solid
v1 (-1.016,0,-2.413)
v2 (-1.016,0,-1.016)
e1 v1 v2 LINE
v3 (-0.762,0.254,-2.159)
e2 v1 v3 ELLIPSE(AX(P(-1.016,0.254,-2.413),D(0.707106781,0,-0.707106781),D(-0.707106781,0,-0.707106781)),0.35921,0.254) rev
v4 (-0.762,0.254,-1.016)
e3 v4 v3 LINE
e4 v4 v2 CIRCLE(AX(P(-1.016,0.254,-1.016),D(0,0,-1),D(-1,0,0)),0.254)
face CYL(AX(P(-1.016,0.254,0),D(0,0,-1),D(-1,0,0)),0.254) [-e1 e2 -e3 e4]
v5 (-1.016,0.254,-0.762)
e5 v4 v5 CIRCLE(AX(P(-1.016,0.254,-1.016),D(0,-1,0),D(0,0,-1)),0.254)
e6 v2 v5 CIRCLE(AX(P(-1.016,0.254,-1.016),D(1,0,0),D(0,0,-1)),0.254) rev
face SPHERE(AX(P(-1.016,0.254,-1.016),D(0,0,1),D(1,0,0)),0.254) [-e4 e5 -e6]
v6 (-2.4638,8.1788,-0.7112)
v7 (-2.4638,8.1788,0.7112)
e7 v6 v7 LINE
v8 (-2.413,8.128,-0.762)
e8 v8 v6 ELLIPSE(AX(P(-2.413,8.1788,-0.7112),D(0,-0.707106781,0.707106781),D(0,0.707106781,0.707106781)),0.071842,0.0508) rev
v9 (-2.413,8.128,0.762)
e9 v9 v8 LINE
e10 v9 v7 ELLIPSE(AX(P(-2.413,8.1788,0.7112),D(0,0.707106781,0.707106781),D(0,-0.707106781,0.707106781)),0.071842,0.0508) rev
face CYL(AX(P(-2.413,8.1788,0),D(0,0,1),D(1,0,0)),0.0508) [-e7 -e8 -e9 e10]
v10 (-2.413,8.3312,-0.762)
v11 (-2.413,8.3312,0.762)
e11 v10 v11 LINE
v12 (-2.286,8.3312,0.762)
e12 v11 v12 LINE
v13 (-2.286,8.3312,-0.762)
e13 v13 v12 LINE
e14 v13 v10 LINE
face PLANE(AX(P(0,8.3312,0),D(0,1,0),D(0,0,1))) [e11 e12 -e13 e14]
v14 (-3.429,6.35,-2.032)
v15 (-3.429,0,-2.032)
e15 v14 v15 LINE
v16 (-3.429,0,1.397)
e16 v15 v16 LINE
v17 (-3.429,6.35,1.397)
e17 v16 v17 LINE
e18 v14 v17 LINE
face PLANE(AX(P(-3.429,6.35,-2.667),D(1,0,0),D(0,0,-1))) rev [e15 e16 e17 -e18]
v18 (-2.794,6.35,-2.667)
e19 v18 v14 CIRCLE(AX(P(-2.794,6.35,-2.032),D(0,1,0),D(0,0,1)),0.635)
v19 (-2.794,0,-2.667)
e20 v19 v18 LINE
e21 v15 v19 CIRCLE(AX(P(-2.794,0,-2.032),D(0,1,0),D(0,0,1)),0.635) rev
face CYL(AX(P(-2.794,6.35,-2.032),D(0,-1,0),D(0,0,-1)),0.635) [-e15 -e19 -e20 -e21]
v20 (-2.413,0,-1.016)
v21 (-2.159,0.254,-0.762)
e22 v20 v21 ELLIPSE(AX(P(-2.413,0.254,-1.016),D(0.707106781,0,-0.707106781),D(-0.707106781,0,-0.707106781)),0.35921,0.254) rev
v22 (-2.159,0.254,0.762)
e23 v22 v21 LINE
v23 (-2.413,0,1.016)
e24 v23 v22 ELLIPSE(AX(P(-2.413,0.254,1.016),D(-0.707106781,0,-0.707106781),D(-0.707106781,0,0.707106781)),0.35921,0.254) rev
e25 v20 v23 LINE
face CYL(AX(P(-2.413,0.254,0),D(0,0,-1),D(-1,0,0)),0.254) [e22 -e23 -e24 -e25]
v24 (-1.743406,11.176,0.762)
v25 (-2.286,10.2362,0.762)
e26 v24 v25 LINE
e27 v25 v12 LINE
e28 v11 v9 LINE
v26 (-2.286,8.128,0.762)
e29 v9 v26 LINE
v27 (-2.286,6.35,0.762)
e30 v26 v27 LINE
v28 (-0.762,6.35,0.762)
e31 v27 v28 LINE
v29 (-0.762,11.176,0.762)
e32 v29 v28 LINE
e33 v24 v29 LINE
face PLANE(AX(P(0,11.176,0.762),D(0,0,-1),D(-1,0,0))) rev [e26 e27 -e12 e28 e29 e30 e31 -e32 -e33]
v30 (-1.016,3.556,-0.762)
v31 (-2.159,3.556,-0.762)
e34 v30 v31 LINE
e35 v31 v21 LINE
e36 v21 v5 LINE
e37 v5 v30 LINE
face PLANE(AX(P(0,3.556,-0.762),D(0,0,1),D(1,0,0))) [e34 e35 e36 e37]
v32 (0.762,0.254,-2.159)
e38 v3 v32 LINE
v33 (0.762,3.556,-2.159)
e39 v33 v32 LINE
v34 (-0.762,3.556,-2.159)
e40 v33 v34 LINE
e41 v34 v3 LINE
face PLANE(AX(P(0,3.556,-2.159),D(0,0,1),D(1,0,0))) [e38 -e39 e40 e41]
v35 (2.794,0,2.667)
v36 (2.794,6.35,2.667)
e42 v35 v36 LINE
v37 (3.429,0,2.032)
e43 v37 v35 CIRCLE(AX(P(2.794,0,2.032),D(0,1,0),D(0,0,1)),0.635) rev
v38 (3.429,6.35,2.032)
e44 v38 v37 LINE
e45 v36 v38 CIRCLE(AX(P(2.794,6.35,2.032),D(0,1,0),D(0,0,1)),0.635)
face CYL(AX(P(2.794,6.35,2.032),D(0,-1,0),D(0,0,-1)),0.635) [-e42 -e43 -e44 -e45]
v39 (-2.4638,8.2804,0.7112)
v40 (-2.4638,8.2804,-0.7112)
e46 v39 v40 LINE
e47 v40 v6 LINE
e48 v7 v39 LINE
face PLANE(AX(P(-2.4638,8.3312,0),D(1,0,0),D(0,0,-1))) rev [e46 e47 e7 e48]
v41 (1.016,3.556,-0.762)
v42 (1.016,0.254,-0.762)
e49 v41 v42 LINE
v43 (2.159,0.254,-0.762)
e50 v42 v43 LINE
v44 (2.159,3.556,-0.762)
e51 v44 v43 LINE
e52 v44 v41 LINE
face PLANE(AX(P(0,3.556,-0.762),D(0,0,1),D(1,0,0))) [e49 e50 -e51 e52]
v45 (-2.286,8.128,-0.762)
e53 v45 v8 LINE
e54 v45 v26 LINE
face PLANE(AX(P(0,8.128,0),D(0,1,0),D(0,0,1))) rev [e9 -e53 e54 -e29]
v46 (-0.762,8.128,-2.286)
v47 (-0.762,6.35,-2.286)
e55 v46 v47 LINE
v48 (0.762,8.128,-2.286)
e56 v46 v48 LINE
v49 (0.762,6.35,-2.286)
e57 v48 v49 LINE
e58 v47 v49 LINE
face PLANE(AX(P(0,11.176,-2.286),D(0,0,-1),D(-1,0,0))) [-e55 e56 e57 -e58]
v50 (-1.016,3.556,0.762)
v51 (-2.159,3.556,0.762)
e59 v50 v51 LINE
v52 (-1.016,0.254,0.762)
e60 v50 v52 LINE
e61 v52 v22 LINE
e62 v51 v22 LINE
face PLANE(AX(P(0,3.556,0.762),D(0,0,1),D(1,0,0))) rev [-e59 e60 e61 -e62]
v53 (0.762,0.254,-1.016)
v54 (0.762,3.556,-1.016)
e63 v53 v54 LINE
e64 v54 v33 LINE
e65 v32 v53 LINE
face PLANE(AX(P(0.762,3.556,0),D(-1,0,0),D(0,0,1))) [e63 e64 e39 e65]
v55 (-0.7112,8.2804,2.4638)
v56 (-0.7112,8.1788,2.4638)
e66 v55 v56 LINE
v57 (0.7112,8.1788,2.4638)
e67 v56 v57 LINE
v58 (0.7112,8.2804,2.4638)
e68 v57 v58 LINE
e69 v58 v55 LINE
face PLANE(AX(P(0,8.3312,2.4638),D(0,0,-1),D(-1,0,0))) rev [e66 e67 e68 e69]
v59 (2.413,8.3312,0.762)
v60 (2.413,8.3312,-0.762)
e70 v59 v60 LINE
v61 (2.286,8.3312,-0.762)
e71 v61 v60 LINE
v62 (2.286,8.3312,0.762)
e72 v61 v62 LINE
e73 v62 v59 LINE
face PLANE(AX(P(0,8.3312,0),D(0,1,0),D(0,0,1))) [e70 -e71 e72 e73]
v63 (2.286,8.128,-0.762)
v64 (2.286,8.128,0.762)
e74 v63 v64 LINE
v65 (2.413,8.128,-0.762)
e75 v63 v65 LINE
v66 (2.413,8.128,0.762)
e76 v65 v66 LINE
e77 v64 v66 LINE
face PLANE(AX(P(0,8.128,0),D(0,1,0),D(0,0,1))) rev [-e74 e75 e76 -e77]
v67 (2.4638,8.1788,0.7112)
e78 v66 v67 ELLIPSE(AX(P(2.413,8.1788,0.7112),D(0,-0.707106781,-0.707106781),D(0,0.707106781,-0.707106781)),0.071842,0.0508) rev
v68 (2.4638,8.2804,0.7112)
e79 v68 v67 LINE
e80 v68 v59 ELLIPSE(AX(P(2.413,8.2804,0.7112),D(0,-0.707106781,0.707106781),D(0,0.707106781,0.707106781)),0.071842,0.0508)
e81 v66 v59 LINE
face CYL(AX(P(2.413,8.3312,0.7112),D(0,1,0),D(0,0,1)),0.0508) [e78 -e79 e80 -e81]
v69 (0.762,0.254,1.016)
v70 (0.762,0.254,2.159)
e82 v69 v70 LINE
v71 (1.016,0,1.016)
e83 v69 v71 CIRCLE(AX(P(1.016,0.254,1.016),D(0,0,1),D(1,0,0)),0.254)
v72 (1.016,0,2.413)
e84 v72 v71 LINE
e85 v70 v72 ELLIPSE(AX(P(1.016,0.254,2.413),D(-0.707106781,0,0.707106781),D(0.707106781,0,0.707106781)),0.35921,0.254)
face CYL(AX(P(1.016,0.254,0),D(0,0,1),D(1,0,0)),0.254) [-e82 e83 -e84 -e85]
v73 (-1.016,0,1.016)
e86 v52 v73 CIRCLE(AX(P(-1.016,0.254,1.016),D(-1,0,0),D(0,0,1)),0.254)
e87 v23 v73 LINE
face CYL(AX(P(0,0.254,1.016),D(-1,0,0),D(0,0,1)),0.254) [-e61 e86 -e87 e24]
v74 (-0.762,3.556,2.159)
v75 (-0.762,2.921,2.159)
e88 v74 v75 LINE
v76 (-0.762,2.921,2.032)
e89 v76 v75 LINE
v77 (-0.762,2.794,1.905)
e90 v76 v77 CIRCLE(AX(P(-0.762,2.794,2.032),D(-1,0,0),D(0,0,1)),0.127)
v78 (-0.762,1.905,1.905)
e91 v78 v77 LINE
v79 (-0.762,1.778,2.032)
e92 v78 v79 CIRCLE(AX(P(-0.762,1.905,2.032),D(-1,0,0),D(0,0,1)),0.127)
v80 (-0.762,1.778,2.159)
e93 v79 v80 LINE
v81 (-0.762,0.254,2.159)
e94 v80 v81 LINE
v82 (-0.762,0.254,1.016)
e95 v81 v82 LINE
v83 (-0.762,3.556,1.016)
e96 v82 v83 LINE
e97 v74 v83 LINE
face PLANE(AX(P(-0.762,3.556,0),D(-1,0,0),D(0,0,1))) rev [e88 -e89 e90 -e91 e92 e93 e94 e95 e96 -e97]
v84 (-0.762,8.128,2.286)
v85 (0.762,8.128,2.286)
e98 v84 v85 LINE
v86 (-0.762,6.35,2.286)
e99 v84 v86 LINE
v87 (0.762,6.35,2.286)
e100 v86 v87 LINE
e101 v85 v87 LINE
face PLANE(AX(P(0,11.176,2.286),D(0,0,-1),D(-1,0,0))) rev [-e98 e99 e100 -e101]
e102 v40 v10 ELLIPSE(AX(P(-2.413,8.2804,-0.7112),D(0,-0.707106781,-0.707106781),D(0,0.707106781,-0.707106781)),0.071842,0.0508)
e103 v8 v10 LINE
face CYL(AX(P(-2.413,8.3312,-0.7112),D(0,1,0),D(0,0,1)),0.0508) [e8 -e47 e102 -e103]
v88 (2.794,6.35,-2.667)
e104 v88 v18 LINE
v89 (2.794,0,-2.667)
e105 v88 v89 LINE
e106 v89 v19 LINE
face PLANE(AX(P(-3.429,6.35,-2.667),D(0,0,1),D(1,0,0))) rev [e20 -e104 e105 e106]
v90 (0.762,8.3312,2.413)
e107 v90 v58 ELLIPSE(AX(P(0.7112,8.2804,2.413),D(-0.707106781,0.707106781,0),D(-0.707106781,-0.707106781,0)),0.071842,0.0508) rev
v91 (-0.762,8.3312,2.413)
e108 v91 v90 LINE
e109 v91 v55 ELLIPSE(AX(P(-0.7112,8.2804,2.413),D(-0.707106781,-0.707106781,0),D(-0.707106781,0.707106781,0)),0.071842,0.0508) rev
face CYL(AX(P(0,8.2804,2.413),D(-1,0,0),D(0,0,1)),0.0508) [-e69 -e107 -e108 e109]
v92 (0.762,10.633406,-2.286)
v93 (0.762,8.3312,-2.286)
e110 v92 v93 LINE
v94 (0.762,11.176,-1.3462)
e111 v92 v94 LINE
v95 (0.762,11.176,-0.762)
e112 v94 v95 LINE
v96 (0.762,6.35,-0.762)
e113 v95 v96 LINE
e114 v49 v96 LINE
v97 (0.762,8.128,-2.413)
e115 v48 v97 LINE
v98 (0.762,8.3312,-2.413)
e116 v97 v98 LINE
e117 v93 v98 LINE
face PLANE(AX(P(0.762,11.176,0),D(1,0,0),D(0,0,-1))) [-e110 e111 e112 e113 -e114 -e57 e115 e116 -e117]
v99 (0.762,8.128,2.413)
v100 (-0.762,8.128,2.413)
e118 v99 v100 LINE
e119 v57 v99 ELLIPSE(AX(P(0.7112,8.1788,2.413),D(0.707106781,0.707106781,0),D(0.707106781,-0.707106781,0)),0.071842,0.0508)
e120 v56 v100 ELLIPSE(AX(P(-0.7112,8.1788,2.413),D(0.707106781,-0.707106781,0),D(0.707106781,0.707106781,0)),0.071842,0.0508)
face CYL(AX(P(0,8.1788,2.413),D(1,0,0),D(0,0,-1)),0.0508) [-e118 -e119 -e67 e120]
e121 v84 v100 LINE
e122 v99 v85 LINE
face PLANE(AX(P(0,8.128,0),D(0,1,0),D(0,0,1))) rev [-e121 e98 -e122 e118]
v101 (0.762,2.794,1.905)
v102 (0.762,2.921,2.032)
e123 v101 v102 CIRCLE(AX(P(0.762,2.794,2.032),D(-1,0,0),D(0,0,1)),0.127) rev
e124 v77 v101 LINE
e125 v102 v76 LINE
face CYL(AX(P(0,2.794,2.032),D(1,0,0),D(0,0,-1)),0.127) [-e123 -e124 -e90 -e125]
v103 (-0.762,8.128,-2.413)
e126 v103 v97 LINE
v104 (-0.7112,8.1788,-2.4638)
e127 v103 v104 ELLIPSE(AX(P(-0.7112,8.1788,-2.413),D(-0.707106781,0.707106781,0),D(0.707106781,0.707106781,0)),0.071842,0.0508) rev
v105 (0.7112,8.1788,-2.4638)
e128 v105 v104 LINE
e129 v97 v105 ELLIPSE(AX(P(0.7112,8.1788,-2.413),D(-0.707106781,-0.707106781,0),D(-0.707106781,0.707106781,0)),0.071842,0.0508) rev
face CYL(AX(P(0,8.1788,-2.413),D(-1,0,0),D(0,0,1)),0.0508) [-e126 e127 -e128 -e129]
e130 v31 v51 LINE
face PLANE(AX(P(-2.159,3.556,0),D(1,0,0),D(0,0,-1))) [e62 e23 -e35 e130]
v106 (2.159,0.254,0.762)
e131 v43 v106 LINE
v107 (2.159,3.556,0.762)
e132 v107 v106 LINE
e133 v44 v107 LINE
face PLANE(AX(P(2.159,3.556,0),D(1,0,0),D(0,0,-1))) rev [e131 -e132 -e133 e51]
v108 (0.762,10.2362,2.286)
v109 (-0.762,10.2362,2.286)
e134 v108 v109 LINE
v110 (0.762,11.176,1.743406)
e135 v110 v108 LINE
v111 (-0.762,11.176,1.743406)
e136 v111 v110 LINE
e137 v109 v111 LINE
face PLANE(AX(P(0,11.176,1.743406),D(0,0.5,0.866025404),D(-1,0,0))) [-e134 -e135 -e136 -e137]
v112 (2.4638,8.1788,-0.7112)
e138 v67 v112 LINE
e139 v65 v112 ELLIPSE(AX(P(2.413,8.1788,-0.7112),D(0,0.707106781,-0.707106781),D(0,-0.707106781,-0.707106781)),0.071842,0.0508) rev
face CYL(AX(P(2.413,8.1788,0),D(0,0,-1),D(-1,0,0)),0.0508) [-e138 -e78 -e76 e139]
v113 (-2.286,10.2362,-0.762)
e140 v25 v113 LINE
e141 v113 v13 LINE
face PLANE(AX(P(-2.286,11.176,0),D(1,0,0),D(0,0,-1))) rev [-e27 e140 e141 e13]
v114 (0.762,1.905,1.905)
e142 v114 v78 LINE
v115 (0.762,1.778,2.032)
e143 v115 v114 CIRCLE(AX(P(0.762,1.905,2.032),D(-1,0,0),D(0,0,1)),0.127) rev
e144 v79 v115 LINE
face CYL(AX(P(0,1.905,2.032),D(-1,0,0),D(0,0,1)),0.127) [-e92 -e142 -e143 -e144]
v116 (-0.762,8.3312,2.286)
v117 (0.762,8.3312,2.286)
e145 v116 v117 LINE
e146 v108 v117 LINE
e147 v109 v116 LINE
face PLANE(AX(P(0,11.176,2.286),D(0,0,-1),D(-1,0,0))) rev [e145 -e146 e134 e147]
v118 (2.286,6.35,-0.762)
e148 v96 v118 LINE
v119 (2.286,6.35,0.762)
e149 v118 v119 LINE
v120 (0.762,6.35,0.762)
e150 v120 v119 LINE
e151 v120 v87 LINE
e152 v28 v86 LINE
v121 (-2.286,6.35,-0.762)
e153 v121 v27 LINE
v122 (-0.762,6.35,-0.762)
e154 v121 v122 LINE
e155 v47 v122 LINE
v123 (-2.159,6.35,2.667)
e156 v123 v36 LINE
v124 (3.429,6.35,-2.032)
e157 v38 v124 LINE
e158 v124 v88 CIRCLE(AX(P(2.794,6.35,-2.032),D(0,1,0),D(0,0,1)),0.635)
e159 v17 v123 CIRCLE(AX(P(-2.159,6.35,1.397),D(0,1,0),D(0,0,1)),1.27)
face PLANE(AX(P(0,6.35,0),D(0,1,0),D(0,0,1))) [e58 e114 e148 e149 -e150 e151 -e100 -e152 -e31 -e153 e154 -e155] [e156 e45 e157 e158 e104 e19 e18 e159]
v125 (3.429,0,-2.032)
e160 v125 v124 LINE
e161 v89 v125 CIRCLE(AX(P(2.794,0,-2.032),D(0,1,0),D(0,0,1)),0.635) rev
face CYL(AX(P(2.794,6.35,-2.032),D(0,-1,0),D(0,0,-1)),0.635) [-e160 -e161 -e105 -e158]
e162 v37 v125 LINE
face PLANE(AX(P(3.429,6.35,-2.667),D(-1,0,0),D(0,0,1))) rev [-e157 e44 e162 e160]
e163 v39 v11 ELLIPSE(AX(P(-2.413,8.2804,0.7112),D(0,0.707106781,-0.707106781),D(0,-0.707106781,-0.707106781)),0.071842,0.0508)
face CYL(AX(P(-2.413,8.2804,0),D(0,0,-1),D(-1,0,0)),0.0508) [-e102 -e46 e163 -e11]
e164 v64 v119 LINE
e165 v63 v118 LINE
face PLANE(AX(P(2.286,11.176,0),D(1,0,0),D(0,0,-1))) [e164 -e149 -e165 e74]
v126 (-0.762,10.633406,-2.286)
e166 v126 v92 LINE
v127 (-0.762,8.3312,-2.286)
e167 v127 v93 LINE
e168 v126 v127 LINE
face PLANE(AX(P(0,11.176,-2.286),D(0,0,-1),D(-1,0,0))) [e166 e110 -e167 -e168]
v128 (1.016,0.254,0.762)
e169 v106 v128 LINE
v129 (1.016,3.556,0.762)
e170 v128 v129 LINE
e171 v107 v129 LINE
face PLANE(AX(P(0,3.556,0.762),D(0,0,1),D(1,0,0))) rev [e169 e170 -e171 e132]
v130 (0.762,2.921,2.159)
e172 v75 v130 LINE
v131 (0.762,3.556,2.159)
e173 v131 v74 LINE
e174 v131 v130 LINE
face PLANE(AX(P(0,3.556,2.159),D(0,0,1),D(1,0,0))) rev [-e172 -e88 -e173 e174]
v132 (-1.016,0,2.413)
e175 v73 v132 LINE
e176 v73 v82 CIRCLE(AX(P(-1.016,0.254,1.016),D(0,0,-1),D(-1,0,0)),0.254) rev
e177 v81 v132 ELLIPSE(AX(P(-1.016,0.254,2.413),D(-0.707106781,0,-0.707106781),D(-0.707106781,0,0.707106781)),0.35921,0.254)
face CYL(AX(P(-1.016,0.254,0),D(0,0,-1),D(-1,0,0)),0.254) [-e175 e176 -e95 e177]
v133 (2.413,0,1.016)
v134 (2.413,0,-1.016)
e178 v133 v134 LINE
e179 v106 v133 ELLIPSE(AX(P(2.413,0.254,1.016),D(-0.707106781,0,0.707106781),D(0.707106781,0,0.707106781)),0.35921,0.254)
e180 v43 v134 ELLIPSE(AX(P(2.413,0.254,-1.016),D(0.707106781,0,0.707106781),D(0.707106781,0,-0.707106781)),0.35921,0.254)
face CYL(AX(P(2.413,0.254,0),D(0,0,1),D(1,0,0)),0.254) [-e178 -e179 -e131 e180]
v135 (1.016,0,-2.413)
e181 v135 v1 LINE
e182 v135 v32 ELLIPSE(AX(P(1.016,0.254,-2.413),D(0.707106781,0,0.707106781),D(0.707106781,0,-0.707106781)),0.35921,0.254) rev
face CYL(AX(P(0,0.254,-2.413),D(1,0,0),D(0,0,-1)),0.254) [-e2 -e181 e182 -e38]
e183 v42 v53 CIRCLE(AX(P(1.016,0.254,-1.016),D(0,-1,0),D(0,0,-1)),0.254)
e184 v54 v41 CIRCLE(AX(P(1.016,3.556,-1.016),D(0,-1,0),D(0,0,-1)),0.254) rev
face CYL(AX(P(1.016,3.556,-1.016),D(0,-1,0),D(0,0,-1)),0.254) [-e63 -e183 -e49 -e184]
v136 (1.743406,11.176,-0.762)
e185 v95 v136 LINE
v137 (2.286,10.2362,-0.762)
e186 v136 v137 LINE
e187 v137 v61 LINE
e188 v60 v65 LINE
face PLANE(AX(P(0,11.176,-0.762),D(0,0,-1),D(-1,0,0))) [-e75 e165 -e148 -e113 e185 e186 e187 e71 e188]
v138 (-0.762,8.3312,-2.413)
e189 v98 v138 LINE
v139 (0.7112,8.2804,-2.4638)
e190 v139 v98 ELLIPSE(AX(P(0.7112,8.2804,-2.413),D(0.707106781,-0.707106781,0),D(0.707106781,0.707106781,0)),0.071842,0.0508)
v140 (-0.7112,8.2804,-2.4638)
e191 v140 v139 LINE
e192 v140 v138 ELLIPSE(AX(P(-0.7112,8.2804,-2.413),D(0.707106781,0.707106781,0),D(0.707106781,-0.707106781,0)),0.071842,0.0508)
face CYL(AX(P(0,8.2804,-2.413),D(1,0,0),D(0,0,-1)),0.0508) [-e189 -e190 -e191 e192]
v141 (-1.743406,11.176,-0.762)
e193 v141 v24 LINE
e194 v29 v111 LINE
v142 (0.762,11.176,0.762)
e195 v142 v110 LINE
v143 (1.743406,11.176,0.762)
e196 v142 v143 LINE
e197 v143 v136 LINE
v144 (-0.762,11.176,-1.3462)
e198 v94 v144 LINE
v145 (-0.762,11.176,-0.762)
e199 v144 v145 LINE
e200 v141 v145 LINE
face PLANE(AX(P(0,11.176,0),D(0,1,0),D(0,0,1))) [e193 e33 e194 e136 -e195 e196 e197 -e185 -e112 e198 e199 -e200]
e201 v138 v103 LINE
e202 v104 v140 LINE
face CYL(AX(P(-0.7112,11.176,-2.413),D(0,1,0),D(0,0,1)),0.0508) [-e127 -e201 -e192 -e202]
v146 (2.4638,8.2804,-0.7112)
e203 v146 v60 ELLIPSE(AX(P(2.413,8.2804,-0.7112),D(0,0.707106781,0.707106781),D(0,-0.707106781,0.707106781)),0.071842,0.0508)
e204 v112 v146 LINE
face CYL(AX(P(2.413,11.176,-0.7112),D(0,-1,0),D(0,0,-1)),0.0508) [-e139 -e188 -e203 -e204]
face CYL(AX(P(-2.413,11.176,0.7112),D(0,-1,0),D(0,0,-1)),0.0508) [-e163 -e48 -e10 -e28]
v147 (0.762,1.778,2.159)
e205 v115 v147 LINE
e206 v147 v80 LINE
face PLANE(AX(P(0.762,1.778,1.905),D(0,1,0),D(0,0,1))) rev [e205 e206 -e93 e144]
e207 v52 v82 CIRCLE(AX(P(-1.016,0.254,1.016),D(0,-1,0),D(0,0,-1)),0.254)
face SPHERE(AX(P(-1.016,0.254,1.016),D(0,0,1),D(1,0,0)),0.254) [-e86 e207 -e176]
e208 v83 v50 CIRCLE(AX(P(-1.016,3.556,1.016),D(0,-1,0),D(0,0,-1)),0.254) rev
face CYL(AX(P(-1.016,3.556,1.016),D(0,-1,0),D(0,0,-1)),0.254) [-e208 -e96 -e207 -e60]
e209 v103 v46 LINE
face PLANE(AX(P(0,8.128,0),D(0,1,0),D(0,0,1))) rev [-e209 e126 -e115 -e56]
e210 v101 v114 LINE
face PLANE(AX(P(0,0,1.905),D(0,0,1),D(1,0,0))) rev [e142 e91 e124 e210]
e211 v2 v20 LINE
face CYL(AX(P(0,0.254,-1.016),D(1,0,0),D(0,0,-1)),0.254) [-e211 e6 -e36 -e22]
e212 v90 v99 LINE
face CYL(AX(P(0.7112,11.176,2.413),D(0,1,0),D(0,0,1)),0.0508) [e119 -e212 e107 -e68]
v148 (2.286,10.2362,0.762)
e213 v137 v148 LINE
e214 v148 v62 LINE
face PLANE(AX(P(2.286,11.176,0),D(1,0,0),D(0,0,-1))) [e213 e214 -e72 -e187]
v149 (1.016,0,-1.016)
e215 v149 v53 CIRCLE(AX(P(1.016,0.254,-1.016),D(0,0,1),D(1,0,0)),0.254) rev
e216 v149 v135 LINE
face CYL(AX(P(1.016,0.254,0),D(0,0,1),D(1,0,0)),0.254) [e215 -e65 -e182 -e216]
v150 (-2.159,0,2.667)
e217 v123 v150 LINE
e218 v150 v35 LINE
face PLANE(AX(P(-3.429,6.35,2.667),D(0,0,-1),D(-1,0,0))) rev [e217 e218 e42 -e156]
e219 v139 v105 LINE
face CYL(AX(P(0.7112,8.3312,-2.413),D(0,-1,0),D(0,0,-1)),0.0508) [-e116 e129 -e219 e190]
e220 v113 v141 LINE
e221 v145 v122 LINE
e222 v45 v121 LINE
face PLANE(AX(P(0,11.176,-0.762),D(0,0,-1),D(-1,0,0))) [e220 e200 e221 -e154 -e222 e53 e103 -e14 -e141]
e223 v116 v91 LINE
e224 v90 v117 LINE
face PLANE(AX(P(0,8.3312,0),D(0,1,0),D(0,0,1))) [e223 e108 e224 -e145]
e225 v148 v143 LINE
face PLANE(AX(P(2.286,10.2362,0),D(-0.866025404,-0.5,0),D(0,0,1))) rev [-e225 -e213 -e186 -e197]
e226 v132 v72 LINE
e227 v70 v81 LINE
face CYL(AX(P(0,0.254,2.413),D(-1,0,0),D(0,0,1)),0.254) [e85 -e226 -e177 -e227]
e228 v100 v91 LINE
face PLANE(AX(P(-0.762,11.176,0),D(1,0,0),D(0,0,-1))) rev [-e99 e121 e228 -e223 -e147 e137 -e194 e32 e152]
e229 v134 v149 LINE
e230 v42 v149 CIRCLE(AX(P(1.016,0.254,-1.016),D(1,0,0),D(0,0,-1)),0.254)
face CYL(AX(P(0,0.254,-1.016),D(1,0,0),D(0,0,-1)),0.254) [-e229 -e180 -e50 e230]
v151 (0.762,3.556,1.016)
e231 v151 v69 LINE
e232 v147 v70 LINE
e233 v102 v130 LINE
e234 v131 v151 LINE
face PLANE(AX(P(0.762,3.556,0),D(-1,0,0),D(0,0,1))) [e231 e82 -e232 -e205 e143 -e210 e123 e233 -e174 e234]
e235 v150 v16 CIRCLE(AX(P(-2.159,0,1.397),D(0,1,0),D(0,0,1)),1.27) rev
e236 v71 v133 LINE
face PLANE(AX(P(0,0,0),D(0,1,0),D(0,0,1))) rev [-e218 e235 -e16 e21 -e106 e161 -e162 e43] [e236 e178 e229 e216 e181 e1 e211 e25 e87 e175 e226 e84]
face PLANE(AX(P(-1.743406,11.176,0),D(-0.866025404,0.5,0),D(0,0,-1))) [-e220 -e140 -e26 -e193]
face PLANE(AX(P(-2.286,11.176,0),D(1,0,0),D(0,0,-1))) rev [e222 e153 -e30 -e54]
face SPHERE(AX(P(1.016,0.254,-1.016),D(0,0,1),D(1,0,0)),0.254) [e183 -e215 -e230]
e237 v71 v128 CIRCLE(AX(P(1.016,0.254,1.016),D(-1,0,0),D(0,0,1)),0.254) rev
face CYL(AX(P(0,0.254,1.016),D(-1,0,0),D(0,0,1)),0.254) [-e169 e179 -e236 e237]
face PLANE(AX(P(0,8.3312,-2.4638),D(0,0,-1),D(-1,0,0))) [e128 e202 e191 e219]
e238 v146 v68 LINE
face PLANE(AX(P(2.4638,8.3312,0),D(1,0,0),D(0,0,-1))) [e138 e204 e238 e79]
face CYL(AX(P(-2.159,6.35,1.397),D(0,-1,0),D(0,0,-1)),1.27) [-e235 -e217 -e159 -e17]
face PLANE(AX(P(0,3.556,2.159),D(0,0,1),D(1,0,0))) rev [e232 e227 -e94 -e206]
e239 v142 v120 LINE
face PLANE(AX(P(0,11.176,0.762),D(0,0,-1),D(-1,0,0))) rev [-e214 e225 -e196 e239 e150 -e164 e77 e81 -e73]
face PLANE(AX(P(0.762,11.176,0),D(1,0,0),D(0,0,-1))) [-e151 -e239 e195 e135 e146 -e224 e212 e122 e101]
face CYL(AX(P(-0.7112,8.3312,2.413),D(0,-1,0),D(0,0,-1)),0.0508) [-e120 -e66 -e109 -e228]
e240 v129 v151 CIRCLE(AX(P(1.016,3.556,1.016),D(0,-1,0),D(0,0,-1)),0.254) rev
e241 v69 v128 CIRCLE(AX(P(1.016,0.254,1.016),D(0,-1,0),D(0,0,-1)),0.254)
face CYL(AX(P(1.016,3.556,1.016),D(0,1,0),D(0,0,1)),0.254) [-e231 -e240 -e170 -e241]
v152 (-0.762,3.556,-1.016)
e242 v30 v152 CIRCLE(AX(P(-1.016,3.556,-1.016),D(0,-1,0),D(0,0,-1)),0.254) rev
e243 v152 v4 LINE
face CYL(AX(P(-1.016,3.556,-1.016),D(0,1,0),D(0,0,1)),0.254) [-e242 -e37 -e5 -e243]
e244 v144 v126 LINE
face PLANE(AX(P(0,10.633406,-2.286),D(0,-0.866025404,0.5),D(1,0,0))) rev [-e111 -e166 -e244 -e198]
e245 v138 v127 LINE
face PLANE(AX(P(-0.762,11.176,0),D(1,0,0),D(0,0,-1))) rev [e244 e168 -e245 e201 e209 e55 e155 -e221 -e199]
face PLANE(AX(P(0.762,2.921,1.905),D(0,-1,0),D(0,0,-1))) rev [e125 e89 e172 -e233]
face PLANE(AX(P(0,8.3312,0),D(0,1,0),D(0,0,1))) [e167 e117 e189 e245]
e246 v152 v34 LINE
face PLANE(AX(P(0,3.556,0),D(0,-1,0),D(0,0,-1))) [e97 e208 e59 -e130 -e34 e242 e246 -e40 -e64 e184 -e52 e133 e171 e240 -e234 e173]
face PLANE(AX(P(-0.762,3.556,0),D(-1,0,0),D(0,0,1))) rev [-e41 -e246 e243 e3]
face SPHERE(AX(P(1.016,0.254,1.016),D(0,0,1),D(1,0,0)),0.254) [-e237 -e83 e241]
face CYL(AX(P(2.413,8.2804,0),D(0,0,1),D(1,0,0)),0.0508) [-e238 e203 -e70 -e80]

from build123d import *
from OCP.BRepFilletAPI import BRepFilletAPI_MakeChamfer

# Parameters (mm, degrees)
SKETCH1_W           = 6.858
SKETCH1_H           = 5.334
BOSS_EXTRUDE1_DEPTH = 6.35
SKETCH2_W           = 1.524
SKETCH2_H           = 1.524
BOSS_EXTRUDE2_DEPTH = 4.826
CHAMFER1_SIZE       = 0.9398
CHAMFER1_SIZE2      = 0.542593783
BOSS_EXTRUDE3_START = -3.048
SKETCH3_W           = 0.720393783
SKETCH3_H           = 1.524
SKETCH3_W_2         = 0.981406217
SKETCH3_W_3         = 1.524
SKETCH3_H_2         = 1.1176
SKETCH3_H_3         = 0.5842
SKETCH3_H_4         = 0.981406217
SKETCH3_H_5         = 0.720393783
BOSS_EXTRUDE3_DEPTH = 0.2032
SKETCH4_W           = 1.397
SKETCH4_H           = 1.524
SKETCH4_W_2         = 1.524
SKETCH4_H_2         = 1.397
CUT_EXTRUDE1_DEPTH  = 3.556
SKETCH5_W           = 1.524
SKETCH5_H           = 1.143
BOSS_EXTRUDE4_DEPTH = 0.254
FILLET1_R           = 0.127
FILLET2_R           = 0.0508
FILLET3_R           = 0.635
FILLET4_R           = 0.254
FILLET5_R           = 0.254
FILLET6_R           = 1.27


with BuildPart() as part:
    # Sketch1 → Boss-Extrude1 (new body)
    with BuildSketch(Plane(origin=(0, 0, 0), x_dir=(1, 0, 0), z_dir=(0, 1, 0))):
        Rectangle(SKETCH1_W, SKETCH1_H)
    extrude(amount=BOSS_EXTRUDE1_DEPTH)

    # Sketch2 → Boss-Extrude2 (add)
    with BuildSketch(Plane(origin=(0, 6.35, 0), x_dir=(1, 0, 0), z_dir=(0, 1, 0))):
        Rectangle(SKETCH2_W, SKETCH2_H)
        with Locations((1.524, 0)):
            Rectangle(SKETCH2_W, SKETCH2_H)
        with Locations((0, 1.524)):
            Rectangle(SKETCH2_W, SKETCH2_H)
        with Locations((-1.524, 0)):
            Rectangle(SKETCH2_W, SKETCH2_H)
        with Locations((0, -1.524)):
            Rectangle(SKETCH2_W, SKETCH2_H)
    extrude(amount=BOSS_EXTRUDE2_DEPTH)

    # Chamfer1: one chamfer whose edges measure the first distance from different faces: ONE call of the kernel's chamfer builder (chamfer() names one face for all edges)
    chamfer1_edges_1 = [part.edges().sort_by_distance(p)[0] for p in [
        (2.286, 11.176, 0),
    ]]
    chamfer1_side_1 = [part.faces().sort_by_distance(p)[0] for p in [
        (2.286, 8.763, 0),
    ]]
    chamfer1_edges_2 = [part.edges().sort_by_distance(p)[0] for p in [
        (0, 11.176, -2.286),
    ]]
    chamfer1_side_2 = [part.faces().sort_by_distance(p)[0] for p in [
        (0, 11.176, 0),
    ]]
    chamfer1_edges_3 = [part.edges().sort_by_distance(p)[0] for p in [
        (-2.286, 11.176, 0),
    ]]
    chamfer1_side_3 = [part.faces().sort_by_distance(p)[0] for p in [
        (-2.286, 8.763, 0),
    ]]
    chamfer1_edges_4 = [part.edges().sort_by_distance(p)[0] for p in [
        (0, 11.176, 2.286),
    ]]
    chamfer1_side_4 = [part.faces().sort_by_distance(p)[0] for p in [
        (0, 8.763, 2.286),
    ]]
    chamfer1 = BRepFilletAPI_MakeChamfer(part.part.solid().wrapped)
    for e in chamfer1_edges_1:
        chamfer1.Add(CHAMFER1_SIZE, CHAMFER1_SIZE2, e.wrapped, chamfer1_side_1[0].wrapped)  # the first distance lies on this face
    for e in chamfer1_edges_2:
        chamfer1.Add(CHAMFER1_SIZE, CHAMFER1_SIZE2, e.wrapped, chamfer1_side_2[0].wrapped)  # the first distance lies on this face
    for e in chamfer1_edges_3:
        chamfer1.Add(CHAMFER1_SIZE, CHAMFER1_SIZE2, e.wrapped, chamfer1_side_3[0].wrapped)  # the first distance lies on this face
    for e in chamfer1_edges_4:
        chamfer1.Add(CHAMFER1_SIZE, CHAMFER1_SIZE2, e.wrapped, chamfer1_side_4[0].wrapped)  # the first distance lies on this face
    add(Compound.cast(chamfer1.Shape()), mode=Mode.REPLACE)

    # Sketch3 → Boss-Extrude3 (add)
    with BuildSketch(Plane(origin=(0, 11.176, 0), x_dir=(1, 0, 0), z_dir=(0, 1, 0)).offset(BOSS_EXTRUDE3_START)):
        with Locations((2.103603109, 0)):
            Rectangle(SKETCH3_W, SKETCH3_H)
        with Locations((1.252703108, 0)):
            Rectangle(SKETCH3_W_2, SKETCH3_H)
        with Locations((0, 1.905)):
            Rectangle(SKETCH3_W_3, SKETCH3_H_2)
        with Locations((0, 1.0541)):
            Rectangle(SKETCH3_W_3, SKETCH3_H_3)
        Rectangle(SKETCH3_W_3, SKETCH3_H)
        with Locations((-1.252703108, 0)):
            Rectangle(SKETCH3_W_2, SKETCH3_H)
        with Locations((-2.103603109, 0)):
            Rectangle(SKETCH3_W, SKETCH3_H)
        with Locations((0, -1.252703108)):
            Rectangle(SKETCH3_W_3, SKETCH3_H_4)
        with Locations((0, -2.103603109)):
            Rectangle(SKETCH3_W_3, SKETCH3_H_5)
    extrude(amount=BOSS_EXTRUDE3_DEPTH)

    # Sketch4 → Cut-Extrude1 (cut)
    with BuildSketch(Plane.XZ):
        with Locations((-1.4605, 0)):
            Rectangle(SKETCH4_W, SKETCH4_H)
        Rectangle(SKETCH4_W_2, SKETCH4_H)
        with Locations((1.4605, 0)):
            Rectangle(SKETCH4_W, SKETCH4_H)
        with Locations((0, -1.4605)):
            Rectangle(SKETCH4_W_2, SKETCH4_H_2)
        with Locations((0, 1.4605)):
            Rectangle(SKETCH4_W_2, SKETCH4_H_2)
    extrude(amount=-CUT_EXTRUDE1_DEPTH, mode=Mode.SUBTRACT)

    # Sketch5 → Boss-Extrude4 (add)
    with BuildSketch(Plane(origin=(0, 0, 2.159), x_dir=(-1, 0, 0), z_dir=(0, 0, -1))):
        with Locations((0, 2.3495)):
            Rectangle(SKETCH5_W, SKETCH5_H)
    extrude(amount=BOSS_EXTRUDE4_DEPTH)

    # Fillet1
    fillet1_edges = [part.edges().sort_by_distance(p)[0] for p in [
        (0, 1.778, 1.905),
        (0, 2.921, 1.905),
    ]]
    fillet(fillet1_edges, radius=FILLET1_R)

    # Fillet2
    fillet2_edges = [part.edges().sort_by_distance(p)[0] for p in [
        (-2.4638, 8.3312, 0),
        (0, 8.3312, 2.4638),
        (2.4638, 8.128, 0),
        (2.4638, 8.3312, 0),
        (2.4638, 8.2296, 0.762),
        (2.4638, 8.2296, -0.762),
        (0, 8.3312, -2.4638),
        (0.762, 8.2296, -2.4638),
        (-0.762, 8.2296, -2.4638),
        (-2.4638, 8.128, 0),
        (-2.4638, 8.2296, -0.762),
        (0, 8.128, 2.4638),
        (-0.762, 8.2296, 2.4638),
        (0, 8.128, -2.4638),
        (-2.4638, 8.2296, 0.762),
        (0.762, 8.2296, 2.4638),
    ]]
    fillet(fillet2_edges, radius=FILLET2_R)

    # Fillet3
    fillet3_edges = [part.edges().sort_by_distance(p)[0] for p in [
        (3.429, 3.175, 2.667),
        (-3.429, 3.175, -2.667),
        (3.429, 3.175, -2.667),
    ]]
    fillet(fillet3_edges, radius=FILLET3_R)

    # Fillet4
    fillet4_edges = [part.edges().sort_by_distance(p)[0] for p in [
        (-1.4605, 0, -0.762),
        (-2.159, 0, 0),
        (0.762, 0, 1.4605),
        (1.4605, 0, -0.762),
        (0.762, 0, -1.4605),
        (0, 0, -2.159),
        (-0.762, 0, -1.4605),
        (2.159, 0, 0),
        (1.4605, 0, 0.762),
        (0, 0, 2.159),
        (-0.762, 0, 1.4605),
        (-1.4605, 0, 0.762),
    ]]
    fillet(fillet4_edges, radius=FILLET4_R)

    # Fillet5
    # the kernel refuses this fillet: 0.254 mm, written as the material it takes off along each edge
    with BuildSketch(Plane(origin=(1.016, 0.254, -1.016), x_dir=(0, 0, 1), z_dir=(-1, 0, 0))) as fillet5_piece_1_section:
        Polygon((0, 0), (FILLET5_R, 0), (FILLET5_R, -FILLET5_R), (0, -FILLET5_R), align=None)
    fillet5_piece_1 = extrude(amount=FILLET5_R, mode=Mode.PRIVATE)
    fillet5_piece_1 = fillet5_piece_1 - Plane(origin=(1.016, 0.254, -1.016), x_dir=(0, 0.7071067811865475, -0.7071067811865475), z_dir=(-1, 0, 0)) * Sphere(FILLET5_R, mode=Mode.PRIVATE)
    add(fillet5_piece_1, mode=Mode.SUBTRACT)
    with BuildSketch(Plane(origin=(1.016, 0.254, 1.016), x_dir=(0, 0, -1), z_dir=(-1, 0, 0))) as fillet5_piece_2_section:
        Polygon((0, 0), (FILLET5_R, 0), (FILLET5_R, FILLET5_R), (0, FILLET5_R), align=None)
    fillet5_piece_2 = extrude(amount=FILLET5_R, mode=Mode.PRIVATE)
    fillet5_piece_2 = fillet5_piece_2 - Plane(origin=(1.016, 0.254, 1.016), x_dir=(0, 0.7071067811865475, 0.7071067811865475), z_dir=(-1, 0, 0)) * Sphere(FILLET5_R, mode=Mode.PRIVATE)
    add(fillet5_piece_2, mode=Mode.SUBTRACT)
    with BuildSketch(Plane(origin=(-1.016, 0.254, -1.016), x_dir=(1, 0, 0), z_dir=(0, 0, 1))) as fillet5_piece_3_section:
        Polygon((0, 0), (FILLET5_R, 0), (FILLET5_R, -FILLET5_R), (0, -FILLET5_R), align=None)
    fillet5_piece_3 = extrude(amount=FILLET5_R, mode=Mode.PRIVATE)
    fillet5_piece_3 = fillet5_piece_3 - Plane(origin=(-1.016, 0.254, -1.016), x_dir=(-0.7071067811865475, 0.7071067811865475, 0), z_dir=(0, 0, 1)) * Sphere(FILLET5_R, mode=Mode.PRIVATE)
    add(fillet5_piece_3, mode=Mode.SUBTRACT)
    with BuildSketch(Plane(origin=(-1.016, 0.254, 1.016), x_dir=(1, 0, 0), z_dir=(0, 0, -1))) as fillet5_piece_4_section:
        Polygon((0, 0), (FILLET5_R, 0), (FILLET5_R, FILLET5_R), (0, FILLET5_R), align=None)
    fillet5_piece_4 = extrude(amount=FILLET5_R, mode=Mode.PRIVATE)
    fillet5_piece_4 = fillet5_piece_4 - Plane(origin=(-1.016, 0.254, 1.016), x_dir=(-0.7071067811865475, 0.7071067811865475, 0), z_dir=(0, 0, -1)) * Sphere(FILLET5_R, mode=Mode.PRIVATE)
    add(fillet5_piece_4, mode=Mode.SUBTRACT)
    with BuildSketch(Plane(origin=(-0.762, 0.254, -0.762), x_dir=(-1, 0, 0), z_dir=(0, 1, 0)), Plane(origin=(0.762, 0.254, -0.762), x_dir=(0, 0, -1), z_dir=(0, 1, 0))) as fillet5_piece_5:
        with BuildLine():
            CenterArc((FILLET5_R, -FILLET5_R), FILLET5_R, 90, 90)
            Line((0, -FILLET5_R), (0, 0))
            Line((0, 0), (FILLET5_R, 0))
        make_face()
    extrude(amount=3.302, mode=Mode.SUBTRACT)
    with BuildSketch(Plane(origin=(-0.762, 0.254, 0.762), x_dir=(-1, 0, 0), z_dir=(0, 1, 0)), Plane(origin=(0.762, 0.254, 0.762), x_dir=(0, 0, 1), z_dir=(0, 1, 0))) as fillet5_piece_6:
        with BuildLine():
            CenterArc((FILLET5_R, FILLET5_R), FILLET5_R, 180, 90)
            Line((0, FILLET5_R), (0, 0))
            Line((0, 0), (FILLET5_R, 0))
        make_face()
    extrude(amount=3.302, mode=Mode.SUBTRACT)

    # Fillet6
    fillet6_edges = [part.edges().sort_by_distance(p)[0] for p in [
        (-3.429, 3.175, 2.667),
    ]]
    fillet(fillet6_edges, radius=FILLET6_R)


solid = part.part
